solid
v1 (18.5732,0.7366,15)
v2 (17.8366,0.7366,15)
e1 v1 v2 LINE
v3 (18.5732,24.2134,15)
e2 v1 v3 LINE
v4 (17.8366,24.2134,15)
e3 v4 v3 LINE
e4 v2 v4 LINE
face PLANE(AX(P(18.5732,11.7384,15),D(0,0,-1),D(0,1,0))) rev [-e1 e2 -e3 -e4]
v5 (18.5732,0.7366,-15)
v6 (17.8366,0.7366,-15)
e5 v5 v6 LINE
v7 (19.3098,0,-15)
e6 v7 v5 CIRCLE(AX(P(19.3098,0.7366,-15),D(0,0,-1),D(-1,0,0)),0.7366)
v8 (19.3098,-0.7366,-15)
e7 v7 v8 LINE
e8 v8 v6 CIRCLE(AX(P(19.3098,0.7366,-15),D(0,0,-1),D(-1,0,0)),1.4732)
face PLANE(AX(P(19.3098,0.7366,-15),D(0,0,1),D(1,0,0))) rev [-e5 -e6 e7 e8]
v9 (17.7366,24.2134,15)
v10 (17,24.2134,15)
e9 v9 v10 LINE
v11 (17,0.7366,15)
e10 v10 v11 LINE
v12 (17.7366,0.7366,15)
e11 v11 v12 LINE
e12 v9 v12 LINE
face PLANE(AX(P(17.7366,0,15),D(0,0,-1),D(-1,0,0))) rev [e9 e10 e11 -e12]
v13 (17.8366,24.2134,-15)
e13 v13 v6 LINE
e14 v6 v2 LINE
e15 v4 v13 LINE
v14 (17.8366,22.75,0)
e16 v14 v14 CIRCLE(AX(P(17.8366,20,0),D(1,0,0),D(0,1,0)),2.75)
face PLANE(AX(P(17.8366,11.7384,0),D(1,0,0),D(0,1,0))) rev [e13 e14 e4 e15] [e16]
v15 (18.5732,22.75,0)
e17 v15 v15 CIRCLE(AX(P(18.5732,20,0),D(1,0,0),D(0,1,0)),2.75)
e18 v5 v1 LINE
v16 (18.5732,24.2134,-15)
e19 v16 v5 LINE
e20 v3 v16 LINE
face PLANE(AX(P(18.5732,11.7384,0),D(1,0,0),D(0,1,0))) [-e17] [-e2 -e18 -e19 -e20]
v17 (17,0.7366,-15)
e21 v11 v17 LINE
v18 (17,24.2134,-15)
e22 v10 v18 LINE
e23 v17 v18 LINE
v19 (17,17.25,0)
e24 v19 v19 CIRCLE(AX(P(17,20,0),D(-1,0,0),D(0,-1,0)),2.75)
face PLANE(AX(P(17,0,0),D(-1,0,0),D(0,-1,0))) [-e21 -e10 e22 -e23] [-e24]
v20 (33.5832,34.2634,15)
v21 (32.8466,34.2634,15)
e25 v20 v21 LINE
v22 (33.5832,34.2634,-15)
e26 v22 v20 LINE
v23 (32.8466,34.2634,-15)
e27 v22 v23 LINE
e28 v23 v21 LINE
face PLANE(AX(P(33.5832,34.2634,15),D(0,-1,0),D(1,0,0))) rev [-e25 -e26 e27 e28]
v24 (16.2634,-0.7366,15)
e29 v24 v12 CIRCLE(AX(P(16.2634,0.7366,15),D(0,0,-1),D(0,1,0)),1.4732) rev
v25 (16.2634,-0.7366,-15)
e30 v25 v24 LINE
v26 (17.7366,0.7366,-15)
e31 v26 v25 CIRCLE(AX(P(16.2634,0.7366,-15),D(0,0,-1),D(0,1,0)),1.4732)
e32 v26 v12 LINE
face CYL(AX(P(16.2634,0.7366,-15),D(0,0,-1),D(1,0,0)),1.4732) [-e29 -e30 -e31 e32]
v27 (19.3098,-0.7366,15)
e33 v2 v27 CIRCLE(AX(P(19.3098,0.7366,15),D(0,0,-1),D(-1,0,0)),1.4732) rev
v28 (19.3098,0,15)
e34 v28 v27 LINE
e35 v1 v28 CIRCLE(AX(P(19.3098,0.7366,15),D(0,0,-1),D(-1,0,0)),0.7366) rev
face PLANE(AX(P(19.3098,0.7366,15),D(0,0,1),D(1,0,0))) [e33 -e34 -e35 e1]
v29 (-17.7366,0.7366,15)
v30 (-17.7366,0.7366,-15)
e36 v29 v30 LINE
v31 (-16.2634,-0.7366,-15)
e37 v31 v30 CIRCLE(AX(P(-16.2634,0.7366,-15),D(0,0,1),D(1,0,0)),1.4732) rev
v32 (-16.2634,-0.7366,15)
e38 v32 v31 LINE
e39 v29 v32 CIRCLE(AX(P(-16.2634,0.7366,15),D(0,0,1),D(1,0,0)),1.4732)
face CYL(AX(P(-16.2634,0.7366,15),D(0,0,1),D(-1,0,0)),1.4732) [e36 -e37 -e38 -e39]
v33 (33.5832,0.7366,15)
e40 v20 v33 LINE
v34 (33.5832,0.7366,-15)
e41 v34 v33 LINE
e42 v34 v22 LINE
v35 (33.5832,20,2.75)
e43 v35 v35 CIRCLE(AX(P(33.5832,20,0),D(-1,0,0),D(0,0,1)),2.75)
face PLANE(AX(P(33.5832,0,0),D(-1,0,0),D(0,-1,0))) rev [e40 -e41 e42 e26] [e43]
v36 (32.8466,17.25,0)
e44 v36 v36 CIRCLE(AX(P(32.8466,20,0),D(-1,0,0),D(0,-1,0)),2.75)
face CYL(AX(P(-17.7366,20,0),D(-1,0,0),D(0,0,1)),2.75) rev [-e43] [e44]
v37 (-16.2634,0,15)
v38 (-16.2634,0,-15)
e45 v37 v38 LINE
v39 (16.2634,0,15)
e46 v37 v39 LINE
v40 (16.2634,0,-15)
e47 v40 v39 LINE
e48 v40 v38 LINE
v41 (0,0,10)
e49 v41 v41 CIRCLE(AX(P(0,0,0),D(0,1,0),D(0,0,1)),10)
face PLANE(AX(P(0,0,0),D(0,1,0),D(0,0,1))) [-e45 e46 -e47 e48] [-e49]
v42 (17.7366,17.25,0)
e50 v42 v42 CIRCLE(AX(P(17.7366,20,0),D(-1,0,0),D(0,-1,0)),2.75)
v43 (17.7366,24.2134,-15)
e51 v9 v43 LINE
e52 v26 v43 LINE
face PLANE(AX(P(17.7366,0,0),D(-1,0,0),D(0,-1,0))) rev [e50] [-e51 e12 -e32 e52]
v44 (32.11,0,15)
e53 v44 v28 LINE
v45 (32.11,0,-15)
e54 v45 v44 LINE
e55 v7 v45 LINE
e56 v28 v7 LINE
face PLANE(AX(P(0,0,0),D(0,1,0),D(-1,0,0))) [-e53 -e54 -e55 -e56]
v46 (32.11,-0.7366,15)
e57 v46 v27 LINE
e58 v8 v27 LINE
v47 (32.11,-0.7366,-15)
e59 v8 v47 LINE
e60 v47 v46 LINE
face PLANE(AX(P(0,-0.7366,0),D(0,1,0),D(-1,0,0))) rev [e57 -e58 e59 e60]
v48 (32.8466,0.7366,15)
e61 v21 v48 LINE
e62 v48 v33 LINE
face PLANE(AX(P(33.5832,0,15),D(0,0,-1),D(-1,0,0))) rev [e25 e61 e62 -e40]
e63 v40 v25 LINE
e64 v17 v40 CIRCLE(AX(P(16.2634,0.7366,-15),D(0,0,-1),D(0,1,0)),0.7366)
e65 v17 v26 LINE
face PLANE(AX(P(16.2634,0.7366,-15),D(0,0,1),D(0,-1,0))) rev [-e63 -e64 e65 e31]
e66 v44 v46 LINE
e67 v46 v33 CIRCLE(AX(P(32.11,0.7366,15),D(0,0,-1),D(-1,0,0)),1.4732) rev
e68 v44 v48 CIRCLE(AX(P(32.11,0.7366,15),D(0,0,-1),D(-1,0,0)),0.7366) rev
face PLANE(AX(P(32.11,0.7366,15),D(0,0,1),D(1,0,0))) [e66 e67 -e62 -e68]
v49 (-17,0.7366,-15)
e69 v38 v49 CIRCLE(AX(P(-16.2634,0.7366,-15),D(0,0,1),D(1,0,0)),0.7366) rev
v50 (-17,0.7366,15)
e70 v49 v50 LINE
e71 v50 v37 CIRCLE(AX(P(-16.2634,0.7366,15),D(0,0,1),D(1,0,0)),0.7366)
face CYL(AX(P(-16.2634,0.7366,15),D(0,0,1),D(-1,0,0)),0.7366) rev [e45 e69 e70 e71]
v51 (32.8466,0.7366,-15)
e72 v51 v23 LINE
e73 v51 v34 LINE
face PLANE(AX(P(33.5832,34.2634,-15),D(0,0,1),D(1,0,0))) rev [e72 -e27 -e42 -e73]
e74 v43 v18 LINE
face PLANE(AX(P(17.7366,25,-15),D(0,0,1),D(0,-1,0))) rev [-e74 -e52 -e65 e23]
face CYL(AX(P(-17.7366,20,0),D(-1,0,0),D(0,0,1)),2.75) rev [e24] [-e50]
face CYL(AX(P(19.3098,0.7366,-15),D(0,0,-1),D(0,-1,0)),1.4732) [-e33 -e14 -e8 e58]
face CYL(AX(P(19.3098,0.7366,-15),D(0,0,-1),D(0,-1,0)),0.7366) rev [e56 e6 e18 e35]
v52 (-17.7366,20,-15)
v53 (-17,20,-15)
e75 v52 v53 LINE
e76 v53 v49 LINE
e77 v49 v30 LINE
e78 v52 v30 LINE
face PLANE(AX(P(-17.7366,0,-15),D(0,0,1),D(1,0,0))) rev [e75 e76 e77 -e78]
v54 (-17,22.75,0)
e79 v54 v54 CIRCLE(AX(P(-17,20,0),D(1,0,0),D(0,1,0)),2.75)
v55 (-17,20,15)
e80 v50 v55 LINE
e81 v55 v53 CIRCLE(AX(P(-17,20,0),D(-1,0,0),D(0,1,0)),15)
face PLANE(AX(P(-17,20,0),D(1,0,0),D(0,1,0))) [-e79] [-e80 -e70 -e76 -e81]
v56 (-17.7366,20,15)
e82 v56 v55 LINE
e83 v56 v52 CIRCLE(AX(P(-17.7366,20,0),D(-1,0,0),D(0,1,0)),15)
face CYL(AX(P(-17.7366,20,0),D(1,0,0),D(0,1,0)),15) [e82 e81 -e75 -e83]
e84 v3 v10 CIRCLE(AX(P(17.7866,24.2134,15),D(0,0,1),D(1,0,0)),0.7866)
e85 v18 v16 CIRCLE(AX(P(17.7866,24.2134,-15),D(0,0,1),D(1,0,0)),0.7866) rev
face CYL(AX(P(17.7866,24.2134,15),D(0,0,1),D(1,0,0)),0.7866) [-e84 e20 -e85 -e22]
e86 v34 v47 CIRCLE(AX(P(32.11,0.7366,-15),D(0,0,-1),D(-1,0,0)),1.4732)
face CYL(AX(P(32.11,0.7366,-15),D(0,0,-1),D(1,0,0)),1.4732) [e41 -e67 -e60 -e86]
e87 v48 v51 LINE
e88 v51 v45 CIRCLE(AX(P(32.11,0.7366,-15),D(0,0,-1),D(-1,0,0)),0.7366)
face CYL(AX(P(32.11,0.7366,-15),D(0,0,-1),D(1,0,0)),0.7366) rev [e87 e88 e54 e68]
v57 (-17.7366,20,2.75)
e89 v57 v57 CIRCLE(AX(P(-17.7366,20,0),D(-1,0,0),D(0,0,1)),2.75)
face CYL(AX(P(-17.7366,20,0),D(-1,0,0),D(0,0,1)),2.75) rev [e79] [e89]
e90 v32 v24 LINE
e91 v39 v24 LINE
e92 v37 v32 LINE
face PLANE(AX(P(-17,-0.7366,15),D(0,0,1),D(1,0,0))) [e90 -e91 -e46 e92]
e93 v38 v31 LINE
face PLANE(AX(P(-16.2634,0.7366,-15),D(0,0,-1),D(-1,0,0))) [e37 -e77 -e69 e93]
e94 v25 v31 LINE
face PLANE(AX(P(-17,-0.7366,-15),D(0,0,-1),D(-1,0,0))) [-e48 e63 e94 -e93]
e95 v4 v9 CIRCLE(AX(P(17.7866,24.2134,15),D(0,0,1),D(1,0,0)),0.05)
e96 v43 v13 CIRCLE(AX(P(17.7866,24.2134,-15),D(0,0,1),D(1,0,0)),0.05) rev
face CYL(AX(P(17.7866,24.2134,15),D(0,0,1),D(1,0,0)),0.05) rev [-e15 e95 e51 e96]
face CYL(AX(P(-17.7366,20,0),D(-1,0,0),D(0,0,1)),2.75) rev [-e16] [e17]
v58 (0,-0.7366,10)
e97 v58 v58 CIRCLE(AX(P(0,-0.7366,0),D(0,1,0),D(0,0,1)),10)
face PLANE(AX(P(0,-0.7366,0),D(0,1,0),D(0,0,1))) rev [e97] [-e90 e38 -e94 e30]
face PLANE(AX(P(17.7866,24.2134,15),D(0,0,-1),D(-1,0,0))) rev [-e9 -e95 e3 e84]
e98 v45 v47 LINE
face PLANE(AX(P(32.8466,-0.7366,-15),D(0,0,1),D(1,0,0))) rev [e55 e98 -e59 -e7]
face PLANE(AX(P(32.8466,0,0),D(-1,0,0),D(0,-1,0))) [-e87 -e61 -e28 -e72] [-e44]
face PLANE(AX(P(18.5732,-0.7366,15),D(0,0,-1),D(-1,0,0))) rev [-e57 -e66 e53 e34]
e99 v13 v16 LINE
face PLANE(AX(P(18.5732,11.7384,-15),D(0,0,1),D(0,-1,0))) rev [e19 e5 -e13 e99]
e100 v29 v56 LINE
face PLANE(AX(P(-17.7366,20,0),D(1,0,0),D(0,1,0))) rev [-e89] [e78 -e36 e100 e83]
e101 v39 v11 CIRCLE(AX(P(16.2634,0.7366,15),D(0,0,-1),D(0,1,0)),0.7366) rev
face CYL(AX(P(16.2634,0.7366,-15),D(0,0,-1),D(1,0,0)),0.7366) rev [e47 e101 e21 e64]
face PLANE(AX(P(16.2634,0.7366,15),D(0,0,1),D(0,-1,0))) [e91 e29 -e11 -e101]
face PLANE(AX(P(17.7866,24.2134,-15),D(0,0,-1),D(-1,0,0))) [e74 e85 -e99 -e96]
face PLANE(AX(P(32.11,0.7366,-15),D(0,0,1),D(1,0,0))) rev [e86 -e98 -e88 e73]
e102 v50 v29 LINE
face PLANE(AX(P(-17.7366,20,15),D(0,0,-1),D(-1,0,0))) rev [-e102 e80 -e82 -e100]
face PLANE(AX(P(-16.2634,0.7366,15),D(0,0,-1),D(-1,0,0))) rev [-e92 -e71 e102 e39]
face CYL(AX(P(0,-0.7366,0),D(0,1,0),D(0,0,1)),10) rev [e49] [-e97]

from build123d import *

# Parameters (mm, degrees)
SKETCH1_W                    = 34
SKETCH1_H                    = 30
SKETCH1_R                    = 10
BASE_FLANGE1_DEPTH           = 0.7366
EDGE_FLANGE1_STRIP_W         = 4.4196
EDGE_FLANGE1_STRIP_H         = 0.7366
EDGE_FLANGE1_STRIP_CUT_DEPTH = 30
EDGE_FLANGE1_DEPTH           = 30
EDGE_FLANGE2_STRIP_W         = 4.4196
EDGE_FLANGE2_STRIP_H         = 0.7366
EDGE_FLANGE2_STRIP_CUT_DEPTH = 30
EDGE_FLANGE2_DEPTH           = 30
EDGE_FLANGE2_START           = 0.7366
EDGE_FLANGE2_FLAT_DEPTH      = 0.7366
HEM1_START                   = -15
HEM1_DEPTH                   = 30
HEM1_2_DEPTH                 = 30
EDGE_FLANGE3_STRIP_W         = 4.4196
EDGE_FLANGE3_STRIP_H         = 0.7366
EDGE_FLANGE3_STRIP_CUT_DEPTH = 30
EDGE_FLANGE3_DEPTH           = 30
EDGE_FLANGE4_STRIP_W         = 4.4196
EDGE_FLANGE4_STRIP_H         = 0.7366
EDGE_FLANGE4_STRIP_CUT_DEPTH = 30
EDGE_FLANGE4_DEPTH           = 30
F_5_5_5_5_DIAMETER_HOLE1_D   = 5.5


# Read off the part's stored shape, not the designer's step: Hem1
# Sheet-metal steps are written as plain solids
with BuildPart() as part:
    # Sketch1 → Base-Flange1 (new body)
    with BuildSketch(Plane(origin=(0, 0, 0), x_dir=(1, 0, 0), z_dir=(0, 1, 0))):
        Rectangle(SKETCH1_W, SKETCH1_H)
        with Locations(Location((0, 0, 0), (0, 0, 270))):
            Circle(SKETCH1_R, mode=Mode.SUBTRACT)
    extrude(amount=-BASE_FLANGE1_DEPTH)

    # Edge-Flange1 strip (across the edge) → Edge-Flange1 strip cut (cut)
    with BuildSketch(Plane(origin=(17, 0, 15), x_dir=(-1, 0, 0), z_dir=(0, 0, -1))):
        with Locations((-1.4732, -0.3683)):
            Rectangle(EDGE_FLANGE1_STRIP_W, EDGE_FLANGE1_STRIP_H)
    extrude(amount=EDGE_FLANGE1_STRIP_CUT_DEPTH, mode=Mode.SUBTRACT)

    # Edge-Flange1 section (across the edge) → Edge-Flange1 (add)
    with BuildSketch(Plane(origin=(17, 0, 15), x_dir=(-1, 0, 0), z_dir=(0, 0, -1))):
        with BuildLine():
            Line((-0.7366, 0.7366), (-0.7366, 25))
            Line((-0.7366, 25), (0, 25))
            Line((0, 25), (0, 0.7366))
            ThreePointArc((0, 0.7366), (0.215745145, 0.215745145), (0.7366, 0))
            Line((0.7366, 0), (0.7366, -0.7366))
            ThreePointArc((0.7366, -0.7366), (-0.30510971, -0.30510971), (-0.7366, 0.7366))
        make_face()
    extrude(amount=EDGE_FLANGE1_DEPTH)

    # Edge-Flange2 strip (across the edge) → Edge-Flange2 strip cut (cut)
    with BuildSketch(Plane(origin=(-17, 0, -15), x_dir=(1, 0, 0), z_dir=(0, 0, 1))):
        with Locations((-1.4732, -0.3683)):
            Rectangle(EDGE_FLANGE2_STRIP_W, EDGE_FLANGE2_STRIP_H)
    extrude(amount=EDGE_FLANGE2_STRIP_CUT_DEPTH, mode=Mode.SUBTRACT)

    # Edge-Flange2 bend section (across the edge) → Edge-Flange2 (add)
    with BuildSketch(Plane(origin=(-17, 0, -15), x_dir=(1, 0, 0), z_dir=(0, 0, 1))):
        with BuildLine():
            Line((-0.7366, 0.7366), (0, 0.7366))
            ThreePointArc((0, 0.7366), (0.215745145, 0.215745145), (0.7366, 0))
            Line((0.7366, 0), (0.7366, -0.7366))
            ThreePointArc((0.7366, -0.7366), (-0.30510971, -0.30510971), (-0.7366, 0.7366))
        make_face()
    extrude(amount=EDGE_FLANGE2_DEPTH)

    # Edge-Flange2 profile (on flange) → Edge-Flange2 flat (add)
    with BuildSketch(Plane.ZY.offset(17).offset(EDGE_FLANGE2_START)):
        with BuildLine():
            ThreePointArc((15, 20), (0, 35), (-15, 20))
            Line((-15, 20), (-15, 0.7366))
            Line((-15, 0.7366), (15, 0.7366))
            Line((15, 0.7366), (15, 20))
        make_face()
    extrude(amount=-EDGE_FLANGE2_FLAT_DEPTH)

    # Hem1 outline → Hem1 (cut)
    with BuildSketch(Plane.XY.offset(HEM1_START)):
        with BuildLine():
            ThreePointArc((17, 24.2134), (17.212984467, 24.751642306), (17.7366, 24.998409274))
            Line((17.7366, 24.998409274), (17.7366, 25))
            Line((17.7366, 25), (17, 25))
            Line((17, 25), (17, 24.2134))
        make_face()
    extrude(amount=HEM1_DEPTH, mode=Mode.SUBTRACT)

    # Hem1 2 outline → Hem1 2 (add)
    with BuildSketch(Plane.XY.offset(HEM1_START)):
        with BuildLine():
            Line((17.8366, -0.7366), (18.5732, -0.7366))
            Line((18.5732, -0.7366), (18.5732, 24.2134))
            ThreePointArc((18.5732, 24.2134), (18.324842306, 24.787015533), (17.7366, 24.998409274))
            Line((17.7366, 24.998409274), (17.7366, 24.2134))
            ThreePointArc((17.7366, 24.2134), (17.7866, 24.2634), (17.8366, 24.2134))
            Line((17.8366, 24.2134), (17.8366, -0.7366))
        make_face()
    extrude(amount=HEM1_2_DEPTH)

    # Edge-Flange3 strip (across the edge) → Edge-Flange3 strip cut (cut)
    with BuildSketch(Plane(origin=(18.5732, -0.7366, 15), x_dir=(0, 1, 0), z_dir=(0, 0, -1))):
        with Locations((-0.7366, -0.3683)):
            Rectangle(EDGE_FLANGE3_STRIP_W, EDGE_FLANGE3_STRIP_H)
    extrude(amount=EDGE_FLANGE3_STRIP_CUT_DEPTH, mode=Mode.SUBTRACT)

    # Edge-Flange3 section (across the edge) → Edge-Flange3 (add)
    with BuildSketch(Plane(origin=(18.5732, -0.7366, 15), x_dir=(0, 1, 0), z_dir=(0, 0, -1))):
        with BuildLine():
            Line((0, 0.7366), (0, 14.2734))
            Line((0, 14.2734), (0.7366, 14.2734))
            Line((0.7366, 14.2734), (0.7366, 0.7366))
            ThreePointArc((0.7366, 0.7366), (0.952345145, 0.215745145), (1.4732, 0))
            Line((1.4732, 0), (1.4732, -0.7366))
            ThreePointArc((1.4732, -0.7366), (0.43149029, -0.30510971), (0, 0.7366))
        make_face()
    extrude(amount=EDGE_FLANGE3_DEPTH)

    # Edge-Flange4 strip (across the edge) → Edge-Flange4 strip cut (cut)
    with BuildSketch(Plane(origin=(32.8466, 0, 15), x_dir=(-1, 0, 0), z_dir=(0, 0, -1))):
        with Locations((-1.4732, -0.3683)):
            Rectangle(EDGE_FLANGE4_STRIP_W, EDGE_FLANGE4_STRIP_H)
    extrude(amount=EDGE_FLANGE4_STRIP_CUT_DEPTH, mode=Mode.SUBTRACT)

    # Edge-Flange4 section (across the edge) → Edge-Flange4 (add)
    with BuildSketch(Plane(origin=(32.8466, 0, 15), x_dir=(-1, 0, 0), z_dir=(0, 0, -1))):
        with BuildLine():
            Line((-0.7366, 0.7366), (-0.7366, 34.2634))
            Line((-0.7366, 34.2634), (0, 34.2634))
            Line((0, 34.2634), (0, 0.7366))
            ThreePointArc((0, 0.7366), (0.215745145, 0.215745145), (0.7366, 0))
            Line((0.7366, 0), (0.7366, -0.7366))
            ThreePointArc((0.7366, -0.7366), (-0.30510971, -0.30510971), (-0.7366, 0.7366))
        make_face()
    extrude(amount=EDGE_FLANGE4_DEPTH)

    # Ø5.5 (5.5) Diameter Hole1 (through all)
    with Locations(Plane.ZY.offset(17.7366)):
        with Locations((0, 20)):
            Hole(F_5_5_5_5_DIAMETER_HOLE1_D / 2)


solid = part.part
